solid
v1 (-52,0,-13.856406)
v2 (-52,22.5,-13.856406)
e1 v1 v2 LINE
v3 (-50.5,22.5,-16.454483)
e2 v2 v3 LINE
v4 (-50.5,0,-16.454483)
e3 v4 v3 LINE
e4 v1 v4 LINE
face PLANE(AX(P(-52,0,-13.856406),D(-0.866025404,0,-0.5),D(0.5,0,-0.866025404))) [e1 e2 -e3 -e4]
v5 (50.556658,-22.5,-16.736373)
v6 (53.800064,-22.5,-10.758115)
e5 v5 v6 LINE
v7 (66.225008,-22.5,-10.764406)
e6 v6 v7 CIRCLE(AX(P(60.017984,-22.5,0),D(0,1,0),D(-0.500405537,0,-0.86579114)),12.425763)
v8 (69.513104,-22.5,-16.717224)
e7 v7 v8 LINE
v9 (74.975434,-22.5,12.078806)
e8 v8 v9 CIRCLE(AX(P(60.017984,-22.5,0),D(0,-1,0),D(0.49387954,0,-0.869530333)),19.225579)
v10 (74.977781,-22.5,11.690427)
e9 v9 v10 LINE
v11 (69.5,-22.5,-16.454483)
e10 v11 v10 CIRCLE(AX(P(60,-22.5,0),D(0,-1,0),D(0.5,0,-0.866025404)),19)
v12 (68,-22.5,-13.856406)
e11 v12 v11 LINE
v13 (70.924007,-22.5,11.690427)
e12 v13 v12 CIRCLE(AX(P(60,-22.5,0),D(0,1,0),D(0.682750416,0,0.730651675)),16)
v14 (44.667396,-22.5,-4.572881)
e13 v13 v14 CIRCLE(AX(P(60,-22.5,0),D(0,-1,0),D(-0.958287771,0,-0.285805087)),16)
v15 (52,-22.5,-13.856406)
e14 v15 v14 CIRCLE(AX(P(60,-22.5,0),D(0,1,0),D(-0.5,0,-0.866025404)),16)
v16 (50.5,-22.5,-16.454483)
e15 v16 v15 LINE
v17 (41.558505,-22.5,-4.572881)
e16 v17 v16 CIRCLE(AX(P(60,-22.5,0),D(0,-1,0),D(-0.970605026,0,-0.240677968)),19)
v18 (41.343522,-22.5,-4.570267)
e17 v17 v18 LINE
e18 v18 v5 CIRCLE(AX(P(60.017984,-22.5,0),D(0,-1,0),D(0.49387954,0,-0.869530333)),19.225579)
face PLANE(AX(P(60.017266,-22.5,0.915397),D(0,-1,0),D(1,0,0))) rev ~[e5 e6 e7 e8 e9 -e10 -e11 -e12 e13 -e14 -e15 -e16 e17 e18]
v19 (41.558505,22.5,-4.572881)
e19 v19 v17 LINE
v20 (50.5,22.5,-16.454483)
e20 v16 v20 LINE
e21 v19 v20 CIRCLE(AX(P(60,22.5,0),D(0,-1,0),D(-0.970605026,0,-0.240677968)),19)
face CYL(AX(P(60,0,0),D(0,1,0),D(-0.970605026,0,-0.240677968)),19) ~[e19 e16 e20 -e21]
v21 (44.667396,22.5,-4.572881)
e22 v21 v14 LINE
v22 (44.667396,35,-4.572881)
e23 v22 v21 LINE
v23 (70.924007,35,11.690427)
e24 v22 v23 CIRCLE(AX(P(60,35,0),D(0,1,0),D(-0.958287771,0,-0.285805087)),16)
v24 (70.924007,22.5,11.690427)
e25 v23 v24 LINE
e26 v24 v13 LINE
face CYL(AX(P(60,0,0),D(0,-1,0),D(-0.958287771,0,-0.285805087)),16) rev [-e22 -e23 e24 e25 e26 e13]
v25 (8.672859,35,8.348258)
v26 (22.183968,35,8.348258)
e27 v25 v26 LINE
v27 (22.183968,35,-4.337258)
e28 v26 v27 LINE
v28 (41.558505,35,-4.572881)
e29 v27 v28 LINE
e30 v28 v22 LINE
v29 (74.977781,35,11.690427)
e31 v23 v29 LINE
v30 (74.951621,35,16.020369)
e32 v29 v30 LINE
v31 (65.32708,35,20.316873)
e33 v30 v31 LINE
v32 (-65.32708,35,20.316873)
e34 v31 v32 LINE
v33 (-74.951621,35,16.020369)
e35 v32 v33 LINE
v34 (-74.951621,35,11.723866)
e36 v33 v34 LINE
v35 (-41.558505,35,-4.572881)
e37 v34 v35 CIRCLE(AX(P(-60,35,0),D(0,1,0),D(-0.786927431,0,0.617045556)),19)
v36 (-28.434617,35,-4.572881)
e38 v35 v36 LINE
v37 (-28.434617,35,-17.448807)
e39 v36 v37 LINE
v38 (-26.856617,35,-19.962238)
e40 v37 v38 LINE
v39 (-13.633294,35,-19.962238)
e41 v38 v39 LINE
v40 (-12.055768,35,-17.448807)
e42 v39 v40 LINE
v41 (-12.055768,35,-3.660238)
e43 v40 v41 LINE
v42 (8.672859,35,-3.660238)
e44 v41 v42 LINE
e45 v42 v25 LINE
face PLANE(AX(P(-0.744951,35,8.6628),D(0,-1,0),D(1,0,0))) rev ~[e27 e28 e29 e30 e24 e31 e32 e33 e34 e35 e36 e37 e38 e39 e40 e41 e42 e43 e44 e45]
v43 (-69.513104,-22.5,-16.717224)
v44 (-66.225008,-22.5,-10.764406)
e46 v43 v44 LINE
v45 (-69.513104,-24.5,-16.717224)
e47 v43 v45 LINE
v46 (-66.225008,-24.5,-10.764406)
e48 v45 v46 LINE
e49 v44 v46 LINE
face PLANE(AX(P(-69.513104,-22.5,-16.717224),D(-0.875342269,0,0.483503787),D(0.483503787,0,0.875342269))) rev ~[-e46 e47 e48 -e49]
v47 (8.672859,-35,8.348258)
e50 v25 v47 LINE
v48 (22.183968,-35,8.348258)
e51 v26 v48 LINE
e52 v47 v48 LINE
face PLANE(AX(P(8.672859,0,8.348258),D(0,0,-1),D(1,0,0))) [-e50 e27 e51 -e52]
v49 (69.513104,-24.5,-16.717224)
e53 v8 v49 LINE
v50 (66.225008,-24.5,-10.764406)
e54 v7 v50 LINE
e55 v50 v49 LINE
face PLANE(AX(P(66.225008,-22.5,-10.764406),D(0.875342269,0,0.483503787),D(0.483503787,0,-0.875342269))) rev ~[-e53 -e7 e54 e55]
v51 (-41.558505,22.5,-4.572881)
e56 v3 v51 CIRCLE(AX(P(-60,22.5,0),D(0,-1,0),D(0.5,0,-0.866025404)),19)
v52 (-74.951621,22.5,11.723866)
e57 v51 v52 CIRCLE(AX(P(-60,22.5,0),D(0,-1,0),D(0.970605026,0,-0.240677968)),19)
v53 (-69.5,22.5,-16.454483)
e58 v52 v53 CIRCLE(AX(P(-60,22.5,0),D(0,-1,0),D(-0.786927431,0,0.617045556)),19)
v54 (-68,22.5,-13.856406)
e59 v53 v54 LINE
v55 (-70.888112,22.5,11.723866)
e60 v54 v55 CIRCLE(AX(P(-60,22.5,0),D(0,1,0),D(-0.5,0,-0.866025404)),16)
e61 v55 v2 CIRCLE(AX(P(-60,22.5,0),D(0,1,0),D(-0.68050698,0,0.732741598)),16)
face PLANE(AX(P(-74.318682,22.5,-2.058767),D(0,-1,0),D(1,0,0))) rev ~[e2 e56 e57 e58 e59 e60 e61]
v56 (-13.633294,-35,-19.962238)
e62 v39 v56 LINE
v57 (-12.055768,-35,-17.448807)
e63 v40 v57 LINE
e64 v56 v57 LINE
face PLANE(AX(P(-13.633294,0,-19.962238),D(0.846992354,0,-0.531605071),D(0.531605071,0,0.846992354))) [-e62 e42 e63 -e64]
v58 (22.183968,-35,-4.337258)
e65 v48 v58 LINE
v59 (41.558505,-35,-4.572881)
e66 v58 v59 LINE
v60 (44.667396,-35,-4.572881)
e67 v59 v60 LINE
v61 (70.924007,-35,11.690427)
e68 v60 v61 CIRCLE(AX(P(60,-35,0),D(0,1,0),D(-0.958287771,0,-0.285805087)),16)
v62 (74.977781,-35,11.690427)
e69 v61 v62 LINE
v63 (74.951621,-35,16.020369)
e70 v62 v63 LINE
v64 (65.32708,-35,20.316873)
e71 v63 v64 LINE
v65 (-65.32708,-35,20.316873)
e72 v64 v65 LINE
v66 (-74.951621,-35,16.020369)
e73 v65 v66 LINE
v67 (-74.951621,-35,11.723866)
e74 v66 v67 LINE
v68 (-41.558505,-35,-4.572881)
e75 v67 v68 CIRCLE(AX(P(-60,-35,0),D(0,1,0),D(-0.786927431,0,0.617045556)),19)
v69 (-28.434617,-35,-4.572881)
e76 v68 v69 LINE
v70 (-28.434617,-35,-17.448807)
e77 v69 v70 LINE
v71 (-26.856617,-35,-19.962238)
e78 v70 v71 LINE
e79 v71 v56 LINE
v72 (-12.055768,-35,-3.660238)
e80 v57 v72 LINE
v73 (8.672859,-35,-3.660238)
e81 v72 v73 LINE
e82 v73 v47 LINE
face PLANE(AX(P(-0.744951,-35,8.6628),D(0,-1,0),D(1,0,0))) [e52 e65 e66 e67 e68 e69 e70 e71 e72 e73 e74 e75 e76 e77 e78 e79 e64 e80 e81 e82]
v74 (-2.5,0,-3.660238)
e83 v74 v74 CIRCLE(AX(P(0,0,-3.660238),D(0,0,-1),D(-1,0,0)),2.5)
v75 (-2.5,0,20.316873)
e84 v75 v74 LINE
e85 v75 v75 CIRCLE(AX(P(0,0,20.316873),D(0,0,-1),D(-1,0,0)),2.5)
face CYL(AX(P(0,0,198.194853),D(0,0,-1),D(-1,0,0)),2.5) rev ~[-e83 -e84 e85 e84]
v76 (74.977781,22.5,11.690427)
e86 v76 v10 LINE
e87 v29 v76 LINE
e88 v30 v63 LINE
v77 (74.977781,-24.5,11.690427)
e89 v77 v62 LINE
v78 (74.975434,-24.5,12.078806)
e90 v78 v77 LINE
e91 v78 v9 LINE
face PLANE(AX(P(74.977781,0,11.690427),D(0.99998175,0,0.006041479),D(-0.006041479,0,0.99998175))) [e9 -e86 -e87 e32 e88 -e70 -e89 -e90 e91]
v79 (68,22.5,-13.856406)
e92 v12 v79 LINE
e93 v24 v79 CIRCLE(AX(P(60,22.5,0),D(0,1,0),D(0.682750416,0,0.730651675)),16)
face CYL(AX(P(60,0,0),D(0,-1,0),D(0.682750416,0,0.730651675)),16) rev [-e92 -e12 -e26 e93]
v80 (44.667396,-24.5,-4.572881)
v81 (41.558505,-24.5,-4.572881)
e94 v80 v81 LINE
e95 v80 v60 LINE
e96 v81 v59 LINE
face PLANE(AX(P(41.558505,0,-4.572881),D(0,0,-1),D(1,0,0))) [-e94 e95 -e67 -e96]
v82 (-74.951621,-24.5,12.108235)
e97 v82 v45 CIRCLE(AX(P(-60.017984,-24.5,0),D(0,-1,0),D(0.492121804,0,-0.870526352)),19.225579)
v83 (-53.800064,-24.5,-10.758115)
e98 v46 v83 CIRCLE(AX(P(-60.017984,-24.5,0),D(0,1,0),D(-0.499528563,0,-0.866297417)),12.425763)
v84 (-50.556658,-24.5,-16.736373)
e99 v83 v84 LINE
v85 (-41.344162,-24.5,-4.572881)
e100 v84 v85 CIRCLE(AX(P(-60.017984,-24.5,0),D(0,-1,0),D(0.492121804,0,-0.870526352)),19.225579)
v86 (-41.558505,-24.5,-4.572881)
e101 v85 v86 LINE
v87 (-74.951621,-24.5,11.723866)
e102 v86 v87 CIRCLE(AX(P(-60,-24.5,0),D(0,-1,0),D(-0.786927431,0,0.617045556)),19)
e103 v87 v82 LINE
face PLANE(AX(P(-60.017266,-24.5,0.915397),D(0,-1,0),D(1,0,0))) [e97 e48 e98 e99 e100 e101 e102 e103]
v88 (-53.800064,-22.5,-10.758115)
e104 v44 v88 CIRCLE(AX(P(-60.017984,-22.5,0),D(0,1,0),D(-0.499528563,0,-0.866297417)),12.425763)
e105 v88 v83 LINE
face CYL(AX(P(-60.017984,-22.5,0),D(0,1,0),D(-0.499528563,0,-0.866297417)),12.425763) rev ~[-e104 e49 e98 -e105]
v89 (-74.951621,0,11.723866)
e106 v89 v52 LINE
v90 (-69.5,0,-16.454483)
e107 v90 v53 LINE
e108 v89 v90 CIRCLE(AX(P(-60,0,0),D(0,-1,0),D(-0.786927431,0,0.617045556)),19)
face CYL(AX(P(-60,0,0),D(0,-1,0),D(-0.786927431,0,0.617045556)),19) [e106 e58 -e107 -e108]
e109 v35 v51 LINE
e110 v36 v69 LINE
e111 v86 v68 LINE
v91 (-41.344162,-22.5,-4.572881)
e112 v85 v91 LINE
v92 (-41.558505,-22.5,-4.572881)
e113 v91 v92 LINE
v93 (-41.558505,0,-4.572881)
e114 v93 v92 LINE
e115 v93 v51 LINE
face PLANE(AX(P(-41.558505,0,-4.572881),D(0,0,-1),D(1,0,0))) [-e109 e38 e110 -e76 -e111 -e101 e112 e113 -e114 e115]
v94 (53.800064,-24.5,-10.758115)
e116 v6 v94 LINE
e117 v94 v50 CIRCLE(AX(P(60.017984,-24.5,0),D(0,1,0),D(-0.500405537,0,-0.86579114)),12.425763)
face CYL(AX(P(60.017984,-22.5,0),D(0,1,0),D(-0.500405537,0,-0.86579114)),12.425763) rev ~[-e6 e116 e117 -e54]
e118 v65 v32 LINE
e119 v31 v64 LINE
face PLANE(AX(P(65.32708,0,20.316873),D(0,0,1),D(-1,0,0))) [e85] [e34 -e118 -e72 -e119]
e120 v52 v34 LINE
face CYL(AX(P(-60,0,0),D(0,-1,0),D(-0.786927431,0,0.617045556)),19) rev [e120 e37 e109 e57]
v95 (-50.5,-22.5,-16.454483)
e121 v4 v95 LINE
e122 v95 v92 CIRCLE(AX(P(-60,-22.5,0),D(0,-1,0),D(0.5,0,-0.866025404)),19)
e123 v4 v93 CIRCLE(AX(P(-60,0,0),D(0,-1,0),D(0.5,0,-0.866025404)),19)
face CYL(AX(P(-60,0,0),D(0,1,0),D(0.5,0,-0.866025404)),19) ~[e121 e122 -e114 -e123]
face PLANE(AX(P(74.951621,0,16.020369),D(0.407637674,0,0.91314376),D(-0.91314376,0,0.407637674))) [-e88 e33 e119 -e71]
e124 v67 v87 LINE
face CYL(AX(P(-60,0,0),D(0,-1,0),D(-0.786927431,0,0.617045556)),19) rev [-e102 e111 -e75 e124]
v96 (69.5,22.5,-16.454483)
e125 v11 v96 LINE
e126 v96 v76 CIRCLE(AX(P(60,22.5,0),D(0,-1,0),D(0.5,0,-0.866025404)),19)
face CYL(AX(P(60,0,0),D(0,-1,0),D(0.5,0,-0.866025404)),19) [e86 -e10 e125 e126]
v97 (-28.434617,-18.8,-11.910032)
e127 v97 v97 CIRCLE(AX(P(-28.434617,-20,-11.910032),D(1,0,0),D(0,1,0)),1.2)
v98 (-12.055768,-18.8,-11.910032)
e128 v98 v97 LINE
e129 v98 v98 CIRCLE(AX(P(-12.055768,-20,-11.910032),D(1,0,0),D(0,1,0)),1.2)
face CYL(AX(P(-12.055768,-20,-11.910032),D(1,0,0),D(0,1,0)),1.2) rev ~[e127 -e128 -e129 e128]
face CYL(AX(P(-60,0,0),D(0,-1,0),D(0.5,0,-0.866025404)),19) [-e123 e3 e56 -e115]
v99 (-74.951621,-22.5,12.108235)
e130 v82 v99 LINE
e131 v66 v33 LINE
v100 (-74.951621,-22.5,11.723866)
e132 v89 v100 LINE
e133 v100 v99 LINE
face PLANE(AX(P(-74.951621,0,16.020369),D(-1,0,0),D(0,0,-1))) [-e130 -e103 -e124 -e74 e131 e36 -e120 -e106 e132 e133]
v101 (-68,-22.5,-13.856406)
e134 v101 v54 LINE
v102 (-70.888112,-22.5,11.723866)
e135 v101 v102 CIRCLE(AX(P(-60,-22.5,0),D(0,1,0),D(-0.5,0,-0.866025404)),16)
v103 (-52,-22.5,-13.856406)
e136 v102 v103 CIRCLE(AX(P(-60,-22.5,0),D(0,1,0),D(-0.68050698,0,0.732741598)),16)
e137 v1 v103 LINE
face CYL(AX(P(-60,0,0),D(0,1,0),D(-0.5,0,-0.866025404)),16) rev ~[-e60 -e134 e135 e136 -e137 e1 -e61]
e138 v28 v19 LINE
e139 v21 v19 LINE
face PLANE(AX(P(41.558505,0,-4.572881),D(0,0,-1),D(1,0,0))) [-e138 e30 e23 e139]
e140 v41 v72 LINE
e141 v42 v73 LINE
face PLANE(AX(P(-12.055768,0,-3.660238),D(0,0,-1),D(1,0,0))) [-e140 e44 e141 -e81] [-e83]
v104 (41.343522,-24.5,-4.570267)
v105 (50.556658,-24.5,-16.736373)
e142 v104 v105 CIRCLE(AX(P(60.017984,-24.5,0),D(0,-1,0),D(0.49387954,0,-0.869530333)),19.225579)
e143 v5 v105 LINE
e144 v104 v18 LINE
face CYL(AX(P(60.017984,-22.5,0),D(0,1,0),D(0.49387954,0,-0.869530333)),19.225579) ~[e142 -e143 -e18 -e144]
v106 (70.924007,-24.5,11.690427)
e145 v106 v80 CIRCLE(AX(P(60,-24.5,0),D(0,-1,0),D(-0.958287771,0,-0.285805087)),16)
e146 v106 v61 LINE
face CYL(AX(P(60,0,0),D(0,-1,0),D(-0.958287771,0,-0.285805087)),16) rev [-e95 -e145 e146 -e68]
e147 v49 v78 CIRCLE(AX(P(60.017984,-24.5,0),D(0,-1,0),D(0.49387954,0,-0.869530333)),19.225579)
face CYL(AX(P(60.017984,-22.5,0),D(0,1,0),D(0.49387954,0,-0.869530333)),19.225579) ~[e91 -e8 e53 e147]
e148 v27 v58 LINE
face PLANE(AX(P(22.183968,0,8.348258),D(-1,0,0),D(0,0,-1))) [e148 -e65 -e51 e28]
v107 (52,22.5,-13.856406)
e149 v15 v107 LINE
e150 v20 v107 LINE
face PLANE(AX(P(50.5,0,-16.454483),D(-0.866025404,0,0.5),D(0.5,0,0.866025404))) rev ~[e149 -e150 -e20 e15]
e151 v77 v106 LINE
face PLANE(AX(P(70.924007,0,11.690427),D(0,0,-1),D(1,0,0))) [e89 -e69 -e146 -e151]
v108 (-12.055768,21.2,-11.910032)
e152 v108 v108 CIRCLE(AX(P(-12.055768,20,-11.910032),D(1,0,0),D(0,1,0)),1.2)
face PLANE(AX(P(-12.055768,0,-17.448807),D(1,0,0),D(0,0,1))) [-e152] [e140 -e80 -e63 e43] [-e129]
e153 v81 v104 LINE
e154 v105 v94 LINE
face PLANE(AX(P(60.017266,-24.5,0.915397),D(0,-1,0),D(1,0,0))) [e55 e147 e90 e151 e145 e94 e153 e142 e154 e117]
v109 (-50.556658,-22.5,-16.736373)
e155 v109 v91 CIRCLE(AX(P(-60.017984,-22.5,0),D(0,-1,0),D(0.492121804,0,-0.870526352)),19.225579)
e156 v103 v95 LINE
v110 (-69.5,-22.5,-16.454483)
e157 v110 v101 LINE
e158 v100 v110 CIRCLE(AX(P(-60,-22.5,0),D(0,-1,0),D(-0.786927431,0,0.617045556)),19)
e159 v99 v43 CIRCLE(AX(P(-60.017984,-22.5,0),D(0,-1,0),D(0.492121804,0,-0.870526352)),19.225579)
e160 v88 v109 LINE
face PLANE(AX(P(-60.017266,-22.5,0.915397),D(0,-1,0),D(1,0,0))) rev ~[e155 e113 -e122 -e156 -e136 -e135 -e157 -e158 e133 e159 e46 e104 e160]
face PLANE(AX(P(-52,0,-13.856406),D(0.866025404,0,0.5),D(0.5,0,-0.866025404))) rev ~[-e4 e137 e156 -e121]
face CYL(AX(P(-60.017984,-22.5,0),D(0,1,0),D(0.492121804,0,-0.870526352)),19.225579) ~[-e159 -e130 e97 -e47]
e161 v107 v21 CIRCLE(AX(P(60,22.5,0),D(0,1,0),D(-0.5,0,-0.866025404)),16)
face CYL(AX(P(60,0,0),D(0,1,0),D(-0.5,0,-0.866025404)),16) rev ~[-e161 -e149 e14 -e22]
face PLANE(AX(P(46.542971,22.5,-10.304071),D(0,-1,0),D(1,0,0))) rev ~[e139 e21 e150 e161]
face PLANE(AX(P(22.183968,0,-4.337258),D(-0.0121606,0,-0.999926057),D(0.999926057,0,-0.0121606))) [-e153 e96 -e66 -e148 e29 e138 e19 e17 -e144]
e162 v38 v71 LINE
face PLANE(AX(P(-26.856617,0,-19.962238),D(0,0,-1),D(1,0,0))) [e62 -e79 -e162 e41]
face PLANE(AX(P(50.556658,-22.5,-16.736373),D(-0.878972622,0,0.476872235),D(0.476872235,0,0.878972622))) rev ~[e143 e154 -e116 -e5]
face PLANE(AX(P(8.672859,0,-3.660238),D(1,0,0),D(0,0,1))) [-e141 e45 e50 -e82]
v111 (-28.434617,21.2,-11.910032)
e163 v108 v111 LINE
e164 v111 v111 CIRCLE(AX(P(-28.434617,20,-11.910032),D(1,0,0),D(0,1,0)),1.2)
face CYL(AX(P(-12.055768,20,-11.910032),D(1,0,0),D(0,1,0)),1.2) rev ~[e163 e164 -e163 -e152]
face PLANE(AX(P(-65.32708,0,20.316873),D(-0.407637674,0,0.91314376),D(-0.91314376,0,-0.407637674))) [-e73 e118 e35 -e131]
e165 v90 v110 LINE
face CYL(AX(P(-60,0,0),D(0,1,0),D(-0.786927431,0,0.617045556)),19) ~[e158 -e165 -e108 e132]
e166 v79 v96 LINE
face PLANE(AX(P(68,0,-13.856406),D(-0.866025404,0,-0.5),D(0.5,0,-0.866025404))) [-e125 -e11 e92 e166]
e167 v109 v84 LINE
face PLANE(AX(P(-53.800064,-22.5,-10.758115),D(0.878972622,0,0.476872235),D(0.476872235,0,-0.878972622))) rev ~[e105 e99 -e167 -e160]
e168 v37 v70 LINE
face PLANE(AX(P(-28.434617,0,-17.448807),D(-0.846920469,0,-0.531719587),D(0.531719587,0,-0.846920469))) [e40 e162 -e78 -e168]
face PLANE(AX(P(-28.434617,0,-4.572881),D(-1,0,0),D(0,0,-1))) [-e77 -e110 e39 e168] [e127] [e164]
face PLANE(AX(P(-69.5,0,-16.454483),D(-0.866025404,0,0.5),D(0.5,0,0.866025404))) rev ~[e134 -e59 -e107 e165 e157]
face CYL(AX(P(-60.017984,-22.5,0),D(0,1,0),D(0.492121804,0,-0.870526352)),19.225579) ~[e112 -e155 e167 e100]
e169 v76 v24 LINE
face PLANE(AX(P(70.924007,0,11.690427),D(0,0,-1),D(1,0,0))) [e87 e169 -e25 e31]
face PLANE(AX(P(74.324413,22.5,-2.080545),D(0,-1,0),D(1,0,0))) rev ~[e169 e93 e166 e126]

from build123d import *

# Parameters (mm, degrees)
F1_DEPTH = 35
F2_DEPTH = 22.5
F5_DEPTH = 2
F7_D     = 2.4
F7_DEPTH = 18
F7_TIP   = 0.7210327428
F10_D    = 5


with BuildPart() as f1:
    # F0 (on Front) → F1 (new body, symmetric)
    with BuildSketch(Plane.XZ):
        with BuildLine():
            ThreePointArc((-74.9516211859, 11.7238655704), (-51.6668855763, 17.075104802), (-41.558504512, -4.5728813857))
            Line((-41.558504512, -4.5728813857), (-28.4346174449, -4.5728813857))
            Line((-28.4346174449, -4.5728813857), (-28.4346174449, -17.4488071352))
            Line((-28.4346174449, -17.4488071352), (-26.8566174449, -19.9622381479))
            Line((-26.8566174449, -19.9622381479), (-13.633294031, -19.9622381479))
            Line((-13.633294031, -19.9622381479), (-12.0557677819, -17.4488071352))
            Line((-12.0557677819, -17.4488071352), (-12.0557677819, -3.6602381479))
            Line((-12.0557677819, -3.6602381479), (8.6728588212, -3.6602381479))
            Line((8.6728588212, -3.6602381479), (8.6728588212, 8.3482577465))
            Line((8.6728588212, 8.3482577465), (22.1839677542, 8.3482577465))
            Line((22.1839677542, 8.3482577465), (22.1839677542, -4.337257977))
            Line((22.1839677542, -4.337257977), (41.558504512, -4.5728813857))
            Line((41.558504512, -4.5728813857), (44.6673956605, -4.5728813857))
            ThreePointArc((44.6673956605, -4.5728813857), (51.5748749774, 13.6021052912), (70.9240066517, 11.6904267961))
            Line((70.9240066517, 11.6904267961), (74.9777809213, 11.6904267961))
            Line((74.9777809213, 11.6904267961), (74.9516211859, 16.0203691918))
            Line((74.9516211859, 16.0203691918), (65.3270802818, 20.3168728132))
            Line((65.3270802818, 20.3168728132), (-65.3270802818, 20.3168728132))
            Line((-65.3270802818, 20.3168728132), (-74.9516211859, 16.0203691918))
            Line((-74.9516211859, 16.0203691918), (-74.9516211859, 11.7238655704))
        make_face()
    extrude(amount=F1_DEPTH, both=True)

    # F0 (on Front) → F2 (join, symmetric)
    with BuildSketch(Plane.XZ):
        with BuildLine():
            ThreePointArc((-68, -13.8564064606), (-75.8989864476, -1.7950570853), (-70.888111686, 11.7238655704))
            Line((-70.888111686, 11.7238655704), (-74.9516211859, 11.7238655704))
            ThreePointArc((-74.9516211859, 11.7238655704), (-78.6540953163, -3.6089787931), (-69.5, -16.4544826719))
            Line((-69.5, -16.4544826719), (-68, -13.8564064606))
        make_face()
        with BuildLine():
            ThreePointArc((-44.6673956605, -4.5728813857), (-47.4441819952, -9.9172291609), (-52, -13.8564064606))
            Line((-52, -13.8564064606), (-50.5, -16.4544826719))
            ThreePointArc((-50.5, -16.4544826719), (-44.818600038, -11.4247579927), (-41.558504512, -4.5728813857))
            Line((-41.558504512, -4.5728813857), (-44.6673956605, -4.5728813857))
        make_face()
        with BuildLine():
            ThreePointArc((-70.888111686, 11.7238655704), (-51.5540323778, 13.5891732981), (-44.6673956605, -4.5728813857))
            Line((-44.6673956605, -4.5728813857), (-41.558504512, -4.5728813857))
            ThreePointArc((-41.558504512, -4.5728813857), (-51.6668855763, 17.075104802), (-74.9516211859, 11.7238655704))
            Line((-74.9516211859, 11.7238655704), (-70.888111686, 11.7238655704))
        make_face()
        with BuildLine():
            ThreePointArc((52, -13.8564064606), (47.4441819952, -9.9172291609), (44.6673956605, -4.5728813857))
            Line((44.6673956605, -4.5728813857), (41.558504512, -4.5728813857))
            ThreePointArc((41.558504512, -4.5728813857), (44.818600038, -11.4247579927), (50.5, -16.4544826719))
            Line((50.5, -16.4544826719), (52, -13.8564064606))
        make_face()
        with BuildLine():
            ThreePointArc((69.5, -16.4544826719), (78.6500515267, -3.629817909), (74.9777809213, 11.6904267961))
            Line((74.9777809213, 11.6904267961), (70.9240066517, 11.6904267961))
            ThreePointArc((70.9240066517, 11.6904267961), (75.8962158798, -1.8194286745), (68, -13.8564064606))
            Line((68, -13.8564064606), (69.5, -16.4544826719))
        make_face()
    extrude(amount=F2_DEPTH, both=True)

    # F4 (on offset) → F5 (join)
    with BuildSketch(Plane.XZ.offset(22.5)):
        with BuildLine():
            ThreePointArc((-66.2250077663, -10.764406164), (-60.0242756476, 12.4257611455), (-53.8000638867, -10.7581152906))
            Line((-53.8000638867, -10.7581152906), (-50.5566579219, -16.7363728506))
            ThreePointArc((-50.5566579219, -16.7363728506), (-59.9985634557, 19.2255688342), (-69.5131042914, -16.7172238027))
            Line((-69.5131042914, -16.7172238027), (-66.2250077663, -10.764406164))
        make_face()
        with BuildLine():
            ThreePointArc((69.5131042914, -16.7172238027), (59.9985634557, 19.2255688342), (50.5566579219, -16.7363728506))
            Line((50.5566579219, -16.7363728506), (53.8000638867, -10.7581152906))
            ThreePointArc((53.8000638867, -10.7581152906), (60.0242756476, 12.4257611455), (66.2250077663, -10.764406164))
            Line((66.2250077663, -10.764406164), (69.5131042914, -16.7172238027))
        make_face()
    extrude(amount=F5_DEPTH)

    # F7 (one way)
    with BuildSketch(Plane.YZ.offset(-12.0557677819)):
        with Locations((-20, -11.9100315496), (20, -11.9100315496)):
            Circle(F7_D / 2)
    extrude(amount=-F7_DEPTH, mode=Mode.SUBTRACT)
    with Locations(Plane.YZ.offset(-12.0557677819)):
        with Locations((-20, -11.9100315496), (20, -11.9100315496)):
            with Locations((0, 0, -(F7_DEPTH + F7_TIP / 2))):  # 118° drill point
                Cone(0, F7_D / 2, F7_TIP, mode=Mode.SUBTRACT)

    # F10 (through all)
    with Locations(Plane.XY.offset(20.3168728132)):
        with Locations((0, 0)):
            Hole(F10_D / 2)


solid = f1.part
